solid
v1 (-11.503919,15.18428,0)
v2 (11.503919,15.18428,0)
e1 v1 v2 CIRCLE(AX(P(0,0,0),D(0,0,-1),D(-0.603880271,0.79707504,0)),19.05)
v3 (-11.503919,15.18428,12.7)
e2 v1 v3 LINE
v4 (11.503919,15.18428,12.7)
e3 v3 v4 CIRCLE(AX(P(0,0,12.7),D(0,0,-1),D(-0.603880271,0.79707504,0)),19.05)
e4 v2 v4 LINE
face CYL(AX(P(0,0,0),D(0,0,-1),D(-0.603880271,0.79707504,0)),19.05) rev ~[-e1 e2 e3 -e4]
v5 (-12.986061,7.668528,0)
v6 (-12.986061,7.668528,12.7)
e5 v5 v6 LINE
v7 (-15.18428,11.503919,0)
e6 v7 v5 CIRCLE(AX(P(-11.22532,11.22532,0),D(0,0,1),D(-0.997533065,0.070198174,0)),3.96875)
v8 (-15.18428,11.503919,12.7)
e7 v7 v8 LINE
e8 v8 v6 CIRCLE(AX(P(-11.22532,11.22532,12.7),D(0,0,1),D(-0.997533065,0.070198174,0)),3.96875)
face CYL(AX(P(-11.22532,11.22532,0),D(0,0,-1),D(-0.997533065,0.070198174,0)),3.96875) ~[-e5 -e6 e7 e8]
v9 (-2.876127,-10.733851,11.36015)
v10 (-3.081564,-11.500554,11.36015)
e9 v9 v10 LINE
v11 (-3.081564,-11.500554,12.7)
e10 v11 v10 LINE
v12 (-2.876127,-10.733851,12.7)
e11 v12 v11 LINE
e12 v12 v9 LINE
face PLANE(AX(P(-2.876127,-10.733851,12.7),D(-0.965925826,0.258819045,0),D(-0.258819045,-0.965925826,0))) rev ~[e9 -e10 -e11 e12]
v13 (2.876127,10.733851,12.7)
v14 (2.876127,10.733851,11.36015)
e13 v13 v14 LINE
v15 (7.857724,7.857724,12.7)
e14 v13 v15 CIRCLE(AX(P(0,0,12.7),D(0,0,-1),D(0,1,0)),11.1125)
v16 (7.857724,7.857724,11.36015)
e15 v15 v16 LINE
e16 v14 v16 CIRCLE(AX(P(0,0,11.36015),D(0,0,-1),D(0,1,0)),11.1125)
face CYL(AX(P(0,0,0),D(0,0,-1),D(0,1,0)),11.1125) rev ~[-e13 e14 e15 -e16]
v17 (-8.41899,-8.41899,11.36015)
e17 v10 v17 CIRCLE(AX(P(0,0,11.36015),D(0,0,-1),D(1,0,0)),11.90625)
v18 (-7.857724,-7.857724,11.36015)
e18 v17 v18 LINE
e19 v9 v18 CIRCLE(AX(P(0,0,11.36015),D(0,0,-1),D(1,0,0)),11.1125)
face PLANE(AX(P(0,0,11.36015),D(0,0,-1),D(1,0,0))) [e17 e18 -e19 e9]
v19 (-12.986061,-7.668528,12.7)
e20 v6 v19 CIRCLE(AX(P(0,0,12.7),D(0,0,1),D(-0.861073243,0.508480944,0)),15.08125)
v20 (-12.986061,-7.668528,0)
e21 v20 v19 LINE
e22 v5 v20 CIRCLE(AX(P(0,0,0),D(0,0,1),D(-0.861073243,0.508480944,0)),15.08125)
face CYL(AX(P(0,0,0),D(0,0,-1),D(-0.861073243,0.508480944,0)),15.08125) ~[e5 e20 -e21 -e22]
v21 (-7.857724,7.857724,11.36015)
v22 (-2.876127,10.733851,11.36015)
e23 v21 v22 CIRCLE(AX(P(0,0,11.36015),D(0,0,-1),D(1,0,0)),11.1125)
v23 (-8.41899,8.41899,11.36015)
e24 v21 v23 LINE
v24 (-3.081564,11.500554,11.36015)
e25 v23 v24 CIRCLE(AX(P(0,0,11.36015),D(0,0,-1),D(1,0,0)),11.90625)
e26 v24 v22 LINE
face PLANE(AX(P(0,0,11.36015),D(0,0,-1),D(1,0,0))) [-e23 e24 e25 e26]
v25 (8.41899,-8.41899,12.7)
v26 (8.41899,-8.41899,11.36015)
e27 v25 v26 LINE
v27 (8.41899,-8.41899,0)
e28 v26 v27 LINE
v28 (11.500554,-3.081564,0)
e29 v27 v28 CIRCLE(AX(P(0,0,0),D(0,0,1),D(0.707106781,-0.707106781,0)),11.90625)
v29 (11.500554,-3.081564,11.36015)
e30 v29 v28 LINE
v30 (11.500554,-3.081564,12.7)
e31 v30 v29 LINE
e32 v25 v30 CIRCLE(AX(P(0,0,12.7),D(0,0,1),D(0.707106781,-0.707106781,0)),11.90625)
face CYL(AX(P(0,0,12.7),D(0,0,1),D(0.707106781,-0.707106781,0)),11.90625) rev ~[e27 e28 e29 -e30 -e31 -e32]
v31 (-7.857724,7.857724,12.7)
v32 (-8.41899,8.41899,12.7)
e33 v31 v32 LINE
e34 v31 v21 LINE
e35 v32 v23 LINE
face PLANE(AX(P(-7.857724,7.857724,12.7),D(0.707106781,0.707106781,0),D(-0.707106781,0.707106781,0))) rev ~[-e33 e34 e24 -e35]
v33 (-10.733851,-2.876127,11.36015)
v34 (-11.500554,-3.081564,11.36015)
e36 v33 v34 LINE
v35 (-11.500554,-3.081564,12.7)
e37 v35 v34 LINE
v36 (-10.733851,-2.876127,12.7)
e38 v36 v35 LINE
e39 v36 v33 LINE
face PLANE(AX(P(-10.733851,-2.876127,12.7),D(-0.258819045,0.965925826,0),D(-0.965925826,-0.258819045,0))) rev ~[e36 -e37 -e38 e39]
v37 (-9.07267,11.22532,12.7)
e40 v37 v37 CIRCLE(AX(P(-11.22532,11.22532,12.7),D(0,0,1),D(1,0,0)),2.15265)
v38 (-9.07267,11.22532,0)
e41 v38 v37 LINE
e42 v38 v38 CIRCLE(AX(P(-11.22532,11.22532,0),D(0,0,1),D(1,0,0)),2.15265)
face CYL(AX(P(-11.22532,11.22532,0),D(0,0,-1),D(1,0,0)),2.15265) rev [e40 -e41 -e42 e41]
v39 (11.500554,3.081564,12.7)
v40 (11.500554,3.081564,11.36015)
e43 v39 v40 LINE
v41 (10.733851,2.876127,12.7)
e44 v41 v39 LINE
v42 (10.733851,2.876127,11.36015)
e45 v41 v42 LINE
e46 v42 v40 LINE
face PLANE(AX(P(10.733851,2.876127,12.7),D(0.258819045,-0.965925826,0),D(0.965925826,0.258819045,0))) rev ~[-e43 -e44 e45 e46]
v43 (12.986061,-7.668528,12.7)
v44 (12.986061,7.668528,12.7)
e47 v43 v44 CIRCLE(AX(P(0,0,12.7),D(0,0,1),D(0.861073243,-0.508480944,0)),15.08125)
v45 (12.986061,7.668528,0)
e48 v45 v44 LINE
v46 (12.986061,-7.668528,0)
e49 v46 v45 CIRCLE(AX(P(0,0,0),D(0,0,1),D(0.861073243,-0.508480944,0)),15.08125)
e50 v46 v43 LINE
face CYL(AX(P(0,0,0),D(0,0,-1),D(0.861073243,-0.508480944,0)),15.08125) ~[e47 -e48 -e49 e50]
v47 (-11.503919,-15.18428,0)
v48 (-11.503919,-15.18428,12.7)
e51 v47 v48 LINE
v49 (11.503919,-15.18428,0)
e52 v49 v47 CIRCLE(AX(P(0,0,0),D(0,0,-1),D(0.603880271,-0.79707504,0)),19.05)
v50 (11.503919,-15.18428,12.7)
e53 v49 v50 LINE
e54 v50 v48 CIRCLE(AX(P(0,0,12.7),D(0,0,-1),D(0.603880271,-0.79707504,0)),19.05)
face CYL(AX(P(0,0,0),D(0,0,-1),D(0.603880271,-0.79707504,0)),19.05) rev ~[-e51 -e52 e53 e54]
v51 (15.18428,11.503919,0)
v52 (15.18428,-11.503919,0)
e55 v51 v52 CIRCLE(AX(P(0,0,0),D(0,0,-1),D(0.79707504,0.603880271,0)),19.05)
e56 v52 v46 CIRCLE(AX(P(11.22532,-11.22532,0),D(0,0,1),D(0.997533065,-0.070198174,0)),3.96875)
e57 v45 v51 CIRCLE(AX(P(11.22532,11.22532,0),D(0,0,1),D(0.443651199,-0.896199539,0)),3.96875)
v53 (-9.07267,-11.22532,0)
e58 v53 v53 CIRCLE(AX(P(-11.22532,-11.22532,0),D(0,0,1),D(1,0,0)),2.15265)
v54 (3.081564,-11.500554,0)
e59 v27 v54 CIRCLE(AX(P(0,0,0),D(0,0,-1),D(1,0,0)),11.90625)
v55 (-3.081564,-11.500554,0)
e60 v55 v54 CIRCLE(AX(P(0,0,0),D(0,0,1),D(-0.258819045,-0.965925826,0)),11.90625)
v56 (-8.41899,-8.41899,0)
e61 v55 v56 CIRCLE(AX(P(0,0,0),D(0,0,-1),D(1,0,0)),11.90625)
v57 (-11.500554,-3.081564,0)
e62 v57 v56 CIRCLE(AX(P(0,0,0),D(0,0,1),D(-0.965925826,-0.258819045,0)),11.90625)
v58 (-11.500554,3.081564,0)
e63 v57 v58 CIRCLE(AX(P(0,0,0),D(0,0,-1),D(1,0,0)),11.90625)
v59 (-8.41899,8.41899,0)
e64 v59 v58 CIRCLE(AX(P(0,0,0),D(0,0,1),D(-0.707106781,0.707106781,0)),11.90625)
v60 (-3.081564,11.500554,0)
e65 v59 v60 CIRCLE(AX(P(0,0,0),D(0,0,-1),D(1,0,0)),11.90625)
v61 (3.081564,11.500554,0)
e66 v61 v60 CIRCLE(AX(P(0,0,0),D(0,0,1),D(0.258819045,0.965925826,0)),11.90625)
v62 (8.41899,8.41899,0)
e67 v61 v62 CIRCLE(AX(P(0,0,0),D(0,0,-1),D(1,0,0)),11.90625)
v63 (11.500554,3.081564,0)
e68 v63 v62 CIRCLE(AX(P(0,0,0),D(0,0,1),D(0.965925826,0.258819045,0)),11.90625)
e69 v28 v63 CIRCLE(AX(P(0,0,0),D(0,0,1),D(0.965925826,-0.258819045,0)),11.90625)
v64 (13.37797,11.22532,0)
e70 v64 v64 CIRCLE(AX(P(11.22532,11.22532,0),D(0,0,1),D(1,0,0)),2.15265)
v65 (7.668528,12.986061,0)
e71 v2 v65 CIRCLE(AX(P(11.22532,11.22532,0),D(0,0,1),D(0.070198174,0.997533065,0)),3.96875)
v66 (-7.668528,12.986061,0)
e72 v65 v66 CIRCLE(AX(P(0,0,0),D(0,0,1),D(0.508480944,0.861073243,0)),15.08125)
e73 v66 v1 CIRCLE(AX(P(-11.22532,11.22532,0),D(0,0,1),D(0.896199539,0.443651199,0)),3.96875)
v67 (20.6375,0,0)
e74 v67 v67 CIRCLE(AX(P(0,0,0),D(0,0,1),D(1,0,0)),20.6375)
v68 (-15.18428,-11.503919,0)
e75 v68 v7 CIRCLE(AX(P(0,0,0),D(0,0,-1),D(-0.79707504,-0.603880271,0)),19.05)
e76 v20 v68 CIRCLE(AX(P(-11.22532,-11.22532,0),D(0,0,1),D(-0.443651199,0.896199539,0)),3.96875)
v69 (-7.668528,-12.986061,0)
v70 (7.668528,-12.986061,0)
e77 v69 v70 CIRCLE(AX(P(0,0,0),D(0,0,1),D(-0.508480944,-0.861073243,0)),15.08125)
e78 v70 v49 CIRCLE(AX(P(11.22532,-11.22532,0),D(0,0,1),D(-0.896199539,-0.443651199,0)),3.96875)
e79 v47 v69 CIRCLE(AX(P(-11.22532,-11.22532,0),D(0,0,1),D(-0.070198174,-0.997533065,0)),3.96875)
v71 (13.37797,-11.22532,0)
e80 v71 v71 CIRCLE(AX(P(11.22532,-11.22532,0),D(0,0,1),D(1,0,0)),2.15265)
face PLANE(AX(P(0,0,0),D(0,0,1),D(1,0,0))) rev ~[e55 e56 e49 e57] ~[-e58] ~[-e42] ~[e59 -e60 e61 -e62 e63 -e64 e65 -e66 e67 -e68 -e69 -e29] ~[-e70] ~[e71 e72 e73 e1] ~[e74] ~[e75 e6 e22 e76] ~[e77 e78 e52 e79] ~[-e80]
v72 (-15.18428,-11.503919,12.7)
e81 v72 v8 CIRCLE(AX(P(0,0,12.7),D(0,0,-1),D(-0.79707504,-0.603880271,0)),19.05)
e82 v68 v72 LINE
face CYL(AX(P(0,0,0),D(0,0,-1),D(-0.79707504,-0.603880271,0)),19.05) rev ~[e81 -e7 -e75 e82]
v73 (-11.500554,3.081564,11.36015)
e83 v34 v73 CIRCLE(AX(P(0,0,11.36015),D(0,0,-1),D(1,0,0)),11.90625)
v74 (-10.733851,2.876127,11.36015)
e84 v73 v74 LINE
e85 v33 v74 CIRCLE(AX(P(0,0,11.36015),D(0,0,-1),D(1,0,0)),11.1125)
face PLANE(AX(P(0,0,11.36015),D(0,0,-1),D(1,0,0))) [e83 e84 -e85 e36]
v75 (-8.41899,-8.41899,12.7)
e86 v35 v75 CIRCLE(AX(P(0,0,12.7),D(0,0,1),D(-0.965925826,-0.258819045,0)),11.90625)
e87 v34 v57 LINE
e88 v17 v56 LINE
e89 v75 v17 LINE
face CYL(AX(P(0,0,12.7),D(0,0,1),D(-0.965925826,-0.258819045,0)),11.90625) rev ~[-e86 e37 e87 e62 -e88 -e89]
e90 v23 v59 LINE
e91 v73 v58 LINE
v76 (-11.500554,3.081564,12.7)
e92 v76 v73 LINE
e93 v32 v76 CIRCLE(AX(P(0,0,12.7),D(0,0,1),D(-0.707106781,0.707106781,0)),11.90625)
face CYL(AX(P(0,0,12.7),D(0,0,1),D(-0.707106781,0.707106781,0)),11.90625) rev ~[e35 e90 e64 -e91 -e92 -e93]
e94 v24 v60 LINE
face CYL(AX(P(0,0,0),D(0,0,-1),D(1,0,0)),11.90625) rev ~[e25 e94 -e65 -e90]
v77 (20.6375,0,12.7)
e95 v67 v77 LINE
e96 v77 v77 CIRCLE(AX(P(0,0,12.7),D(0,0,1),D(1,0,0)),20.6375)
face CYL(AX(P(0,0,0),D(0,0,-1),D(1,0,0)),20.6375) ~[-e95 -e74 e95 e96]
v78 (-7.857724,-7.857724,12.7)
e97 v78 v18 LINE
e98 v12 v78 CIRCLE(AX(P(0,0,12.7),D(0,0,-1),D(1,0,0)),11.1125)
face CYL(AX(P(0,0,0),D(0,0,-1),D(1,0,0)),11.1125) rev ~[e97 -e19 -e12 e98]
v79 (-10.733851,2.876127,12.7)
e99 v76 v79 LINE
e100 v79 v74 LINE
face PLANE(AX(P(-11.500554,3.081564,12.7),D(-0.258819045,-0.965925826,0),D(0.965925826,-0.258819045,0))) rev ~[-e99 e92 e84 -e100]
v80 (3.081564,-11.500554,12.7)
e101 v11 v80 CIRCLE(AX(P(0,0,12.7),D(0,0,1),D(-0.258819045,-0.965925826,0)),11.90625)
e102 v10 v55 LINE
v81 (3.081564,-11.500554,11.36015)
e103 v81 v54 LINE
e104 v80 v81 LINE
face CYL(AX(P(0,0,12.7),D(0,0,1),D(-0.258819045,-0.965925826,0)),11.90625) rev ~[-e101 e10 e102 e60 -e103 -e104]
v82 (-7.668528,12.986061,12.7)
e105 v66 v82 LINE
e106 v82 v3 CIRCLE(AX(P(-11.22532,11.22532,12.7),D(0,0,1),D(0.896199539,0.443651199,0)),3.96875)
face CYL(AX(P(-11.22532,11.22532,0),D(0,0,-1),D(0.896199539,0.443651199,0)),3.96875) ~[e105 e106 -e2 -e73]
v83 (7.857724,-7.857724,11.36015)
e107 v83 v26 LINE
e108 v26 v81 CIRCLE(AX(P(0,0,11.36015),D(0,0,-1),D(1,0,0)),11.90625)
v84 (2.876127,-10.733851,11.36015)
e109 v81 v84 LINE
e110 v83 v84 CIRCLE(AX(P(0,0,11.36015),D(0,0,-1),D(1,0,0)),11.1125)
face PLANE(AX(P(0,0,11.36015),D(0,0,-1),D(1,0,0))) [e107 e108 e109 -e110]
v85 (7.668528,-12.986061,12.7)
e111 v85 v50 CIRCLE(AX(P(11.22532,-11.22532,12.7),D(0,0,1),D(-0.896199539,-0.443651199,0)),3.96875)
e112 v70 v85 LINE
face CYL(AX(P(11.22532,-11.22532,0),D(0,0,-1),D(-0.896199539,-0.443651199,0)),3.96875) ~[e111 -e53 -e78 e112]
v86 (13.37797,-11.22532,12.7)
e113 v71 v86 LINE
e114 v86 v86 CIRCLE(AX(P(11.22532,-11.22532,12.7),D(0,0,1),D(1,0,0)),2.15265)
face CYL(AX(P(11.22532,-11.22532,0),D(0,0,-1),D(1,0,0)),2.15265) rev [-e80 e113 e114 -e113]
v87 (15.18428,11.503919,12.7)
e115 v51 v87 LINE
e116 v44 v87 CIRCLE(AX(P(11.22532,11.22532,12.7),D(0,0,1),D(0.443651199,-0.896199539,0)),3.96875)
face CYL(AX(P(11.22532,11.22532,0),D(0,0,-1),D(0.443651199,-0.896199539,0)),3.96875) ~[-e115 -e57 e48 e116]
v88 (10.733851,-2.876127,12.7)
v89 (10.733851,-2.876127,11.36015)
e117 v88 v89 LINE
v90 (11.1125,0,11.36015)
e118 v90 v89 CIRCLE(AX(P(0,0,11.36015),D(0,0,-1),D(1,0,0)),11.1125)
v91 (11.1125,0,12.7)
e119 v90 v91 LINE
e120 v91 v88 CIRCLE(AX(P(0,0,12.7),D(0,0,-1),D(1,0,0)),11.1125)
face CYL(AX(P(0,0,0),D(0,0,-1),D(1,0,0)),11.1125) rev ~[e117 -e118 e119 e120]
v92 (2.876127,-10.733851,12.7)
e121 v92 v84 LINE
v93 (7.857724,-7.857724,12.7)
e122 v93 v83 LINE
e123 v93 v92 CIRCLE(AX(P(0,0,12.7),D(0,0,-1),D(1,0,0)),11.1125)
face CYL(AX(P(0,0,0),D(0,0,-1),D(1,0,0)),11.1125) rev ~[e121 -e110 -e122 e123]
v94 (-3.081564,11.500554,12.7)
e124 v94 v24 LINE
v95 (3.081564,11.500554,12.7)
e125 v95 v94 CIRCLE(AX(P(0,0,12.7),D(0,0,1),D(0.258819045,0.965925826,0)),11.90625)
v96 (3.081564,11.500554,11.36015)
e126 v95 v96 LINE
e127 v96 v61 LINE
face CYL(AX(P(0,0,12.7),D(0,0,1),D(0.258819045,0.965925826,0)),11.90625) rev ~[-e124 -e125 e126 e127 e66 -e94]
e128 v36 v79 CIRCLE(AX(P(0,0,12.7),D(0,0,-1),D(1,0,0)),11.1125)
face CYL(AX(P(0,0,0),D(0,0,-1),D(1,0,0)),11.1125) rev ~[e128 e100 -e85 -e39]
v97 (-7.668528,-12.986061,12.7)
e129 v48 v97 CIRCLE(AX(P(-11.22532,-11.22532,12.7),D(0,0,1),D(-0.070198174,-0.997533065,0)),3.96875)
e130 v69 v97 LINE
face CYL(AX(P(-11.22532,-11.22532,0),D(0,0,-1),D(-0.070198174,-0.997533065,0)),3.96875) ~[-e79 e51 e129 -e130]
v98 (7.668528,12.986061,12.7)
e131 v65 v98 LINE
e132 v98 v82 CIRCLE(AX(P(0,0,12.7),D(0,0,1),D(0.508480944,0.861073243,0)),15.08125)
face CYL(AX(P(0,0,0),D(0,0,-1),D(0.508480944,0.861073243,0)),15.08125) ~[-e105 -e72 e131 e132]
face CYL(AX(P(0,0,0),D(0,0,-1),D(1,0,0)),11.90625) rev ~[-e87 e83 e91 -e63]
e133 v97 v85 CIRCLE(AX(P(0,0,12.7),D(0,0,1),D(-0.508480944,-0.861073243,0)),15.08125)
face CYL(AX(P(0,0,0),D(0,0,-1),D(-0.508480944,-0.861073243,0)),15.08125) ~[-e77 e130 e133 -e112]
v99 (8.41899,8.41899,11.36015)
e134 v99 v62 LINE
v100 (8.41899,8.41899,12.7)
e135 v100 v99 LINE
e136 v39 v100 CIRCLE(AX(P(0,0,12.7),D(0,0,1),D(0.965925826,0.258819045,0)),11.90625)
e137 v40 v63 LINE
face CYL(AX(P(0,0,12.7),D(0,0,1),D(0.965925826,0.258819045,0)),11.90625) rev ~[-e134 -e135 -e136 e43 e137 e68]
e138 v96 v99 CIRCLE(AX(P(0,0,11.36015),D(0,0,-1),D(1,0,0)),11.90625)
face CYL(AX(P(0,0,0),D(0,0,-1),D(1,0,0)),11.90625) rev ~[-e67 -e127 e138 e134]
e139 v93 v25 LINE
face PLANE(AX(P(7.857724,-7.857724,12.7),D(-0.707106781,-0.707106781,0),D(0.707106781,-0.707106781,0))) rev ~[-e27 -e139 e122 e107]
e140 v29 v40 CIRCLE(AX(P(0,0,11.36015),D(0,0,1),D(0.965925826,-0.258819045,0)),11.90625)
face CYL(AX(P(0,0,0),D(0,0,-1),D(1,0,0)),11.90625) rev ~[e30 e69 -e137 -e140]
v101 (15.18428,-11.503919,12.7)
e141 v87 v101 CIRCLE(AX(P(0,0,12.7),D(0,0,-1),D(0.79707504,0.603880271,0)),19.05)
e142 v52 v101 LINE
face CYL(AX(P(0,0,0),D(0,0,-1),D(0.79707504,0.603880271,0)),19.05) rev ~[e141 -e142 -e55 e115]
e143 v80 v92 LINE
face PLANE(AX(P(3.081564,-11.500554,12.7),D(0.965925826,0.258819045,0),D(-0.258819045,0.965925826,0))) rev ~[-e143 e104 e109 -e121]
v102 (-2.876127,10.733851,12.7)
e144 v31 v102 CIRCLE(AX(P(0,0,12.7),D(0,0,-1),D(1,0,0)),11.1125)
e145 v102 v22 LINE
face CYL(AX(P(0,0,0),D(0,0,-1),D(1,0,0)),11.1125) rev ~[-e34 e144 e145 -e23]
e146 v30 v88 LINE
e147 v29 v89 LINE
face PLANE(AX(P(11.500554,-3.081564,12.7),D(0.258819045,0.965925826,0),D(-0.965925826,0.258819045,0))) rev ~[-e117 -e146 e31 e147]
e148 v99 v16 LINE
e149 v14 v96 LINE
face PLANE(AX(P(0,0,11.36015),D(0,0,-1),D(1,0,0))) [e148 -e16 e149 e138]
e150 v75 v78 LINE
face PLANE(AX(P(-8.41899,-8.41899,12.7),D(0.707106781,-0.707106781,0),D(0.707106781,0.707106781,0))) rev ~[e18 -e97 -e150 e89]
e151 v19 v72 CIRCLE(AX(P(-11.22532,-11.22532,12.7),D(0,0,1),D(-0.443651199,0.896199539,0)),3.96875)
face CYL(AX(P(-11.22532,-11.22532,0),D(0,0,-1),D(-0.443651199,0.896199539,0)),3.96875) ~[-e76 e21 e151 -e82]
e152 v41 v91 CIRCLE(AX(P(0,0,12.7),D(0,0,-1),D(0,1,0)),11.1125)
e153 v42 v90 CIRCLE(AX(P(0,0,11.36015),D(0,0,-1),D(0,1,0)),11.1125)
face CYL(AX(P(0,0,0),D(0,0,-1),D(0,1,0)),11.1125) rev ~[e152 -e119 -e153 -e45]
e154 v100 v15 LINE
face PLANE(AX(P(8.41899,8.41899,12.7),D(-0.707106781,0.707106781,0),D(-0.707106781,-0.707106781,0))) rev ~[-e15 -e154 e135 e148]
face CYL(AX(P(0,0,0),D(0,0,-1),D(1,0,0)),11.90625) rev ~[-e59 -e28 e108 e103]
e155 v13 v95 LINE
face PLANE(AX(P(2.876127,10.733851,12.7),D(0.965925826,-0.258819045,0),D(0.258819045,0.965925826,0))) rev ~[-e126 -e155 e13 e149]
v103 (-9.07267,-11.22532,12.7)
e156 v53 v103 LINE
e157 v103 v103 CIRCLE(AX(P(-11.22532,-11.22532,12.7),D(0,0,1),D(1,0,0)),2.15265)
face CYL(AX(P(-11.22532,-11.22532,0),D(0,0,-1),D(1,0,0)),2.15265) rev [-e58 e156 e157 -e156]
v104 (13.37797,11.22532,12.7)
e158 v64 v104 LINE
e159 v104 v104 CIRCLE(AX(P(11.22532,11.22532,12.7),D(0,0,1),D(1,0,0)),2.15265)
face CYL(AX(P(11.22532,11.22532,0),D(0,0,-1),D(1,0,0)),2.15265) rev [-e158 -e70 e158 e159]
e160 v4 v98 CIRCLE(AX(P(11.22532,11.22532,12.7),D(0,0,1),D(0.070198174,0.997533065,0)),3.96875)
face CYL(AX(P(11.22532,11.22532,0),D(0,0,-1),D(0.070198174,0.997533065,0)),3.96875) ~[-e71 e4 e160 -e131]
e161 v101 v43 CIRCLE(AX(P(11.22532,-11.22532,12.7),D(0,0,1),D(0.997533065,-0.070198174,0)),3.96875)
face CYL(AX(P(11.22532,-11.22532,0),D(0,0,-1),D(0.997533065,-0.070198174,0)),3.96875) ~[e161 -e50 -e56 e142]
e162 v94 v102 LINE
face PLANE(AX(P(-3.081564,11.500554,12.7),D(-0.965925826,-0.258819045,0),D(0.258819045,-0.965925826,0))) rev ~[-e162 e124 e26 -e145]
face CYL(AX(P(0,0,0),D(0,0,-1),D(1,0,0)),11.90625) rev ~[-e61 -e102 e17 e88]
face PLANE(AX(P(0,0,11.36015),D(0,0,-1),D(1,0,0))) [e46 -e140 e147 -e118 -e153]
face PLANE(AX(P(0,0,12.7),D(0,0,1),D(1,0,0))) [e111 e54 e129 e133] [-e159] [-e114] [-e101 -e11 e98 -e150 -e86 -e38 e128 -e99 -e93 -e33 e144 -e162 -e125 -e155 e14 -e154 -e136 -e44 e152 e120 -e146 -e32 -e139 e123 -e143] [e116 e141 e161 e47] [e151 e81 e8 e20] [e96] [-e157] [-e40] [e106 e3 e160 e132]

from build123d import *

# Parameters (mm, degrees)
F0_R            = 20.6375
F0_R_2          = 2.15265
F1_DEPTH        = 12.7
F3_DEPTH        = 12.7
F4_COUNT        = 6
F4_ANGLE        = 300
F6_R            = 11.90625
F7_DEPTH        = 11.36015
F9_DEPTH        = 12.7
F9_COPIES_COUNT = 4


# Not quite as in the source:
# - a pattern or mirror of a feature is missing from the dataset's text; its kind, count and spacing are read off the source's solid


with BuildPart() as f1:
    # F0 (on Top) → F1 (new body)
    with BuildSketch(Plane.XY):
        Circle(F0_R)
        with Locations((-11.2253201513, -11.2253201513)):
            Circle(F0_R_2, mode=Mode.SUBTRACT)
        with Locations((11.2253201513, -11.2253201513)):
            Circle(F0_R_2, mode=Mode.SUBTRACT)
        with Locations((-11.2253201513, 11.2253201513)):
            Circle(F0_R_2, mode=Mode.SUBTRACT)
        with BuildLine():
            ThreePointArc((0, 11.1125), (7.8577241059, 7.8577241059), (11.1125, 0))
            ThreePointArc((11.1125, 0), (-7.8577241059, -7.8577241059), (0, 11.1125))
        make_face(mode=Mode.SUBTRACT)
        with Locations((11.2253201513, 11.2253201513)):
            Circle(F0_R_2, mode=Mode.SUBTRACT)
    extrude(amount=F1_DEPTH)

    # F2 (on face) → F3 (cut, through all)
    with BuildSketch(Plane.XY.offset(12.7)):
        with BuildLine():
            ThreePointArc((-2.8761266387, 10.7338507446), (0, 11.1125), (2.8761266387, 10.7338507446))
            Line((2.8761266387, 10.7338507446), (3.0815642558, 11.5005543693))
            ThreePointArc((3.0815642558, 11.5005543693), (0, 11.90625), (-3.0815642558, 11.5005543693))
            Line((-3.0815642558, 11.5005543693), (-2.8761266387, 10.7338507446))
        make_face()
    f3 = extrude(amount=-F3_DEPTH, mode=Mode.SUBTRACT)

    # F4: F3 ×6 about axis
    f4_axis = Axis((0, 0, 0), (0, 0, -1))
    for i in range(1, F4_COUNT):
        add(f3.rotate(f4_axis, i * F4_ANGLE / (F4_COUNT - 1)), mode=Mode.SUBTRACT)

    # F6 (on face) → F7 (cut, through all)
    with BuildSketch(Plane(origin=(0, 0, 0), x_dir=(1, 0, 0), z_dir=(0, 0, -1))):
        Circle(F6_R)
    extrude(amount=-F7_DEPTH, mode=Mode.SUBTRACT)

    # F8 (on face) → F9 (cut, through all)
    with BuildSketch(Plane(origin=(0, 0, 0), x_dir=(1, 0, 0), z_dir=(0, 0, -1))):
        with BuildLine():
            ThreePointArc((11.5039191556, -15.1842795042), (9.251826165, -14.6686177057), (7.6685282311, -12.9860608474))
            ThreePointArc((7.6685282311, -12.9860608474), (0, -15.08125), (-7.6685282311, -12.9860608474))
            ThreePointArc((-7.6685282311, -12.9860608474), (-9.251826165, -14.6686177057), (-11.5039191556, -15.1842795042))
            ThreePointArc((-11.5039191556, -15.1842795042), (0, -19.05), (11.5039191556, -15.1842795042))
        make_face()
    f9 = extrude(amount=-F9_DEPTH, mode=Mode.SUBTRACT)

    # F9_copies: F9 ×4 about axis
    f9_copies_axis = Axis((0, 0, 0), (0, 0, 1))
    for i in range(1, F9_COPIES_COUNT):
        add(f9.rotate(f9_copies_axis, i * 360 / F9_COPIES_COUNT), mode=Mode.SUBTRACT)


solid = f1.part
